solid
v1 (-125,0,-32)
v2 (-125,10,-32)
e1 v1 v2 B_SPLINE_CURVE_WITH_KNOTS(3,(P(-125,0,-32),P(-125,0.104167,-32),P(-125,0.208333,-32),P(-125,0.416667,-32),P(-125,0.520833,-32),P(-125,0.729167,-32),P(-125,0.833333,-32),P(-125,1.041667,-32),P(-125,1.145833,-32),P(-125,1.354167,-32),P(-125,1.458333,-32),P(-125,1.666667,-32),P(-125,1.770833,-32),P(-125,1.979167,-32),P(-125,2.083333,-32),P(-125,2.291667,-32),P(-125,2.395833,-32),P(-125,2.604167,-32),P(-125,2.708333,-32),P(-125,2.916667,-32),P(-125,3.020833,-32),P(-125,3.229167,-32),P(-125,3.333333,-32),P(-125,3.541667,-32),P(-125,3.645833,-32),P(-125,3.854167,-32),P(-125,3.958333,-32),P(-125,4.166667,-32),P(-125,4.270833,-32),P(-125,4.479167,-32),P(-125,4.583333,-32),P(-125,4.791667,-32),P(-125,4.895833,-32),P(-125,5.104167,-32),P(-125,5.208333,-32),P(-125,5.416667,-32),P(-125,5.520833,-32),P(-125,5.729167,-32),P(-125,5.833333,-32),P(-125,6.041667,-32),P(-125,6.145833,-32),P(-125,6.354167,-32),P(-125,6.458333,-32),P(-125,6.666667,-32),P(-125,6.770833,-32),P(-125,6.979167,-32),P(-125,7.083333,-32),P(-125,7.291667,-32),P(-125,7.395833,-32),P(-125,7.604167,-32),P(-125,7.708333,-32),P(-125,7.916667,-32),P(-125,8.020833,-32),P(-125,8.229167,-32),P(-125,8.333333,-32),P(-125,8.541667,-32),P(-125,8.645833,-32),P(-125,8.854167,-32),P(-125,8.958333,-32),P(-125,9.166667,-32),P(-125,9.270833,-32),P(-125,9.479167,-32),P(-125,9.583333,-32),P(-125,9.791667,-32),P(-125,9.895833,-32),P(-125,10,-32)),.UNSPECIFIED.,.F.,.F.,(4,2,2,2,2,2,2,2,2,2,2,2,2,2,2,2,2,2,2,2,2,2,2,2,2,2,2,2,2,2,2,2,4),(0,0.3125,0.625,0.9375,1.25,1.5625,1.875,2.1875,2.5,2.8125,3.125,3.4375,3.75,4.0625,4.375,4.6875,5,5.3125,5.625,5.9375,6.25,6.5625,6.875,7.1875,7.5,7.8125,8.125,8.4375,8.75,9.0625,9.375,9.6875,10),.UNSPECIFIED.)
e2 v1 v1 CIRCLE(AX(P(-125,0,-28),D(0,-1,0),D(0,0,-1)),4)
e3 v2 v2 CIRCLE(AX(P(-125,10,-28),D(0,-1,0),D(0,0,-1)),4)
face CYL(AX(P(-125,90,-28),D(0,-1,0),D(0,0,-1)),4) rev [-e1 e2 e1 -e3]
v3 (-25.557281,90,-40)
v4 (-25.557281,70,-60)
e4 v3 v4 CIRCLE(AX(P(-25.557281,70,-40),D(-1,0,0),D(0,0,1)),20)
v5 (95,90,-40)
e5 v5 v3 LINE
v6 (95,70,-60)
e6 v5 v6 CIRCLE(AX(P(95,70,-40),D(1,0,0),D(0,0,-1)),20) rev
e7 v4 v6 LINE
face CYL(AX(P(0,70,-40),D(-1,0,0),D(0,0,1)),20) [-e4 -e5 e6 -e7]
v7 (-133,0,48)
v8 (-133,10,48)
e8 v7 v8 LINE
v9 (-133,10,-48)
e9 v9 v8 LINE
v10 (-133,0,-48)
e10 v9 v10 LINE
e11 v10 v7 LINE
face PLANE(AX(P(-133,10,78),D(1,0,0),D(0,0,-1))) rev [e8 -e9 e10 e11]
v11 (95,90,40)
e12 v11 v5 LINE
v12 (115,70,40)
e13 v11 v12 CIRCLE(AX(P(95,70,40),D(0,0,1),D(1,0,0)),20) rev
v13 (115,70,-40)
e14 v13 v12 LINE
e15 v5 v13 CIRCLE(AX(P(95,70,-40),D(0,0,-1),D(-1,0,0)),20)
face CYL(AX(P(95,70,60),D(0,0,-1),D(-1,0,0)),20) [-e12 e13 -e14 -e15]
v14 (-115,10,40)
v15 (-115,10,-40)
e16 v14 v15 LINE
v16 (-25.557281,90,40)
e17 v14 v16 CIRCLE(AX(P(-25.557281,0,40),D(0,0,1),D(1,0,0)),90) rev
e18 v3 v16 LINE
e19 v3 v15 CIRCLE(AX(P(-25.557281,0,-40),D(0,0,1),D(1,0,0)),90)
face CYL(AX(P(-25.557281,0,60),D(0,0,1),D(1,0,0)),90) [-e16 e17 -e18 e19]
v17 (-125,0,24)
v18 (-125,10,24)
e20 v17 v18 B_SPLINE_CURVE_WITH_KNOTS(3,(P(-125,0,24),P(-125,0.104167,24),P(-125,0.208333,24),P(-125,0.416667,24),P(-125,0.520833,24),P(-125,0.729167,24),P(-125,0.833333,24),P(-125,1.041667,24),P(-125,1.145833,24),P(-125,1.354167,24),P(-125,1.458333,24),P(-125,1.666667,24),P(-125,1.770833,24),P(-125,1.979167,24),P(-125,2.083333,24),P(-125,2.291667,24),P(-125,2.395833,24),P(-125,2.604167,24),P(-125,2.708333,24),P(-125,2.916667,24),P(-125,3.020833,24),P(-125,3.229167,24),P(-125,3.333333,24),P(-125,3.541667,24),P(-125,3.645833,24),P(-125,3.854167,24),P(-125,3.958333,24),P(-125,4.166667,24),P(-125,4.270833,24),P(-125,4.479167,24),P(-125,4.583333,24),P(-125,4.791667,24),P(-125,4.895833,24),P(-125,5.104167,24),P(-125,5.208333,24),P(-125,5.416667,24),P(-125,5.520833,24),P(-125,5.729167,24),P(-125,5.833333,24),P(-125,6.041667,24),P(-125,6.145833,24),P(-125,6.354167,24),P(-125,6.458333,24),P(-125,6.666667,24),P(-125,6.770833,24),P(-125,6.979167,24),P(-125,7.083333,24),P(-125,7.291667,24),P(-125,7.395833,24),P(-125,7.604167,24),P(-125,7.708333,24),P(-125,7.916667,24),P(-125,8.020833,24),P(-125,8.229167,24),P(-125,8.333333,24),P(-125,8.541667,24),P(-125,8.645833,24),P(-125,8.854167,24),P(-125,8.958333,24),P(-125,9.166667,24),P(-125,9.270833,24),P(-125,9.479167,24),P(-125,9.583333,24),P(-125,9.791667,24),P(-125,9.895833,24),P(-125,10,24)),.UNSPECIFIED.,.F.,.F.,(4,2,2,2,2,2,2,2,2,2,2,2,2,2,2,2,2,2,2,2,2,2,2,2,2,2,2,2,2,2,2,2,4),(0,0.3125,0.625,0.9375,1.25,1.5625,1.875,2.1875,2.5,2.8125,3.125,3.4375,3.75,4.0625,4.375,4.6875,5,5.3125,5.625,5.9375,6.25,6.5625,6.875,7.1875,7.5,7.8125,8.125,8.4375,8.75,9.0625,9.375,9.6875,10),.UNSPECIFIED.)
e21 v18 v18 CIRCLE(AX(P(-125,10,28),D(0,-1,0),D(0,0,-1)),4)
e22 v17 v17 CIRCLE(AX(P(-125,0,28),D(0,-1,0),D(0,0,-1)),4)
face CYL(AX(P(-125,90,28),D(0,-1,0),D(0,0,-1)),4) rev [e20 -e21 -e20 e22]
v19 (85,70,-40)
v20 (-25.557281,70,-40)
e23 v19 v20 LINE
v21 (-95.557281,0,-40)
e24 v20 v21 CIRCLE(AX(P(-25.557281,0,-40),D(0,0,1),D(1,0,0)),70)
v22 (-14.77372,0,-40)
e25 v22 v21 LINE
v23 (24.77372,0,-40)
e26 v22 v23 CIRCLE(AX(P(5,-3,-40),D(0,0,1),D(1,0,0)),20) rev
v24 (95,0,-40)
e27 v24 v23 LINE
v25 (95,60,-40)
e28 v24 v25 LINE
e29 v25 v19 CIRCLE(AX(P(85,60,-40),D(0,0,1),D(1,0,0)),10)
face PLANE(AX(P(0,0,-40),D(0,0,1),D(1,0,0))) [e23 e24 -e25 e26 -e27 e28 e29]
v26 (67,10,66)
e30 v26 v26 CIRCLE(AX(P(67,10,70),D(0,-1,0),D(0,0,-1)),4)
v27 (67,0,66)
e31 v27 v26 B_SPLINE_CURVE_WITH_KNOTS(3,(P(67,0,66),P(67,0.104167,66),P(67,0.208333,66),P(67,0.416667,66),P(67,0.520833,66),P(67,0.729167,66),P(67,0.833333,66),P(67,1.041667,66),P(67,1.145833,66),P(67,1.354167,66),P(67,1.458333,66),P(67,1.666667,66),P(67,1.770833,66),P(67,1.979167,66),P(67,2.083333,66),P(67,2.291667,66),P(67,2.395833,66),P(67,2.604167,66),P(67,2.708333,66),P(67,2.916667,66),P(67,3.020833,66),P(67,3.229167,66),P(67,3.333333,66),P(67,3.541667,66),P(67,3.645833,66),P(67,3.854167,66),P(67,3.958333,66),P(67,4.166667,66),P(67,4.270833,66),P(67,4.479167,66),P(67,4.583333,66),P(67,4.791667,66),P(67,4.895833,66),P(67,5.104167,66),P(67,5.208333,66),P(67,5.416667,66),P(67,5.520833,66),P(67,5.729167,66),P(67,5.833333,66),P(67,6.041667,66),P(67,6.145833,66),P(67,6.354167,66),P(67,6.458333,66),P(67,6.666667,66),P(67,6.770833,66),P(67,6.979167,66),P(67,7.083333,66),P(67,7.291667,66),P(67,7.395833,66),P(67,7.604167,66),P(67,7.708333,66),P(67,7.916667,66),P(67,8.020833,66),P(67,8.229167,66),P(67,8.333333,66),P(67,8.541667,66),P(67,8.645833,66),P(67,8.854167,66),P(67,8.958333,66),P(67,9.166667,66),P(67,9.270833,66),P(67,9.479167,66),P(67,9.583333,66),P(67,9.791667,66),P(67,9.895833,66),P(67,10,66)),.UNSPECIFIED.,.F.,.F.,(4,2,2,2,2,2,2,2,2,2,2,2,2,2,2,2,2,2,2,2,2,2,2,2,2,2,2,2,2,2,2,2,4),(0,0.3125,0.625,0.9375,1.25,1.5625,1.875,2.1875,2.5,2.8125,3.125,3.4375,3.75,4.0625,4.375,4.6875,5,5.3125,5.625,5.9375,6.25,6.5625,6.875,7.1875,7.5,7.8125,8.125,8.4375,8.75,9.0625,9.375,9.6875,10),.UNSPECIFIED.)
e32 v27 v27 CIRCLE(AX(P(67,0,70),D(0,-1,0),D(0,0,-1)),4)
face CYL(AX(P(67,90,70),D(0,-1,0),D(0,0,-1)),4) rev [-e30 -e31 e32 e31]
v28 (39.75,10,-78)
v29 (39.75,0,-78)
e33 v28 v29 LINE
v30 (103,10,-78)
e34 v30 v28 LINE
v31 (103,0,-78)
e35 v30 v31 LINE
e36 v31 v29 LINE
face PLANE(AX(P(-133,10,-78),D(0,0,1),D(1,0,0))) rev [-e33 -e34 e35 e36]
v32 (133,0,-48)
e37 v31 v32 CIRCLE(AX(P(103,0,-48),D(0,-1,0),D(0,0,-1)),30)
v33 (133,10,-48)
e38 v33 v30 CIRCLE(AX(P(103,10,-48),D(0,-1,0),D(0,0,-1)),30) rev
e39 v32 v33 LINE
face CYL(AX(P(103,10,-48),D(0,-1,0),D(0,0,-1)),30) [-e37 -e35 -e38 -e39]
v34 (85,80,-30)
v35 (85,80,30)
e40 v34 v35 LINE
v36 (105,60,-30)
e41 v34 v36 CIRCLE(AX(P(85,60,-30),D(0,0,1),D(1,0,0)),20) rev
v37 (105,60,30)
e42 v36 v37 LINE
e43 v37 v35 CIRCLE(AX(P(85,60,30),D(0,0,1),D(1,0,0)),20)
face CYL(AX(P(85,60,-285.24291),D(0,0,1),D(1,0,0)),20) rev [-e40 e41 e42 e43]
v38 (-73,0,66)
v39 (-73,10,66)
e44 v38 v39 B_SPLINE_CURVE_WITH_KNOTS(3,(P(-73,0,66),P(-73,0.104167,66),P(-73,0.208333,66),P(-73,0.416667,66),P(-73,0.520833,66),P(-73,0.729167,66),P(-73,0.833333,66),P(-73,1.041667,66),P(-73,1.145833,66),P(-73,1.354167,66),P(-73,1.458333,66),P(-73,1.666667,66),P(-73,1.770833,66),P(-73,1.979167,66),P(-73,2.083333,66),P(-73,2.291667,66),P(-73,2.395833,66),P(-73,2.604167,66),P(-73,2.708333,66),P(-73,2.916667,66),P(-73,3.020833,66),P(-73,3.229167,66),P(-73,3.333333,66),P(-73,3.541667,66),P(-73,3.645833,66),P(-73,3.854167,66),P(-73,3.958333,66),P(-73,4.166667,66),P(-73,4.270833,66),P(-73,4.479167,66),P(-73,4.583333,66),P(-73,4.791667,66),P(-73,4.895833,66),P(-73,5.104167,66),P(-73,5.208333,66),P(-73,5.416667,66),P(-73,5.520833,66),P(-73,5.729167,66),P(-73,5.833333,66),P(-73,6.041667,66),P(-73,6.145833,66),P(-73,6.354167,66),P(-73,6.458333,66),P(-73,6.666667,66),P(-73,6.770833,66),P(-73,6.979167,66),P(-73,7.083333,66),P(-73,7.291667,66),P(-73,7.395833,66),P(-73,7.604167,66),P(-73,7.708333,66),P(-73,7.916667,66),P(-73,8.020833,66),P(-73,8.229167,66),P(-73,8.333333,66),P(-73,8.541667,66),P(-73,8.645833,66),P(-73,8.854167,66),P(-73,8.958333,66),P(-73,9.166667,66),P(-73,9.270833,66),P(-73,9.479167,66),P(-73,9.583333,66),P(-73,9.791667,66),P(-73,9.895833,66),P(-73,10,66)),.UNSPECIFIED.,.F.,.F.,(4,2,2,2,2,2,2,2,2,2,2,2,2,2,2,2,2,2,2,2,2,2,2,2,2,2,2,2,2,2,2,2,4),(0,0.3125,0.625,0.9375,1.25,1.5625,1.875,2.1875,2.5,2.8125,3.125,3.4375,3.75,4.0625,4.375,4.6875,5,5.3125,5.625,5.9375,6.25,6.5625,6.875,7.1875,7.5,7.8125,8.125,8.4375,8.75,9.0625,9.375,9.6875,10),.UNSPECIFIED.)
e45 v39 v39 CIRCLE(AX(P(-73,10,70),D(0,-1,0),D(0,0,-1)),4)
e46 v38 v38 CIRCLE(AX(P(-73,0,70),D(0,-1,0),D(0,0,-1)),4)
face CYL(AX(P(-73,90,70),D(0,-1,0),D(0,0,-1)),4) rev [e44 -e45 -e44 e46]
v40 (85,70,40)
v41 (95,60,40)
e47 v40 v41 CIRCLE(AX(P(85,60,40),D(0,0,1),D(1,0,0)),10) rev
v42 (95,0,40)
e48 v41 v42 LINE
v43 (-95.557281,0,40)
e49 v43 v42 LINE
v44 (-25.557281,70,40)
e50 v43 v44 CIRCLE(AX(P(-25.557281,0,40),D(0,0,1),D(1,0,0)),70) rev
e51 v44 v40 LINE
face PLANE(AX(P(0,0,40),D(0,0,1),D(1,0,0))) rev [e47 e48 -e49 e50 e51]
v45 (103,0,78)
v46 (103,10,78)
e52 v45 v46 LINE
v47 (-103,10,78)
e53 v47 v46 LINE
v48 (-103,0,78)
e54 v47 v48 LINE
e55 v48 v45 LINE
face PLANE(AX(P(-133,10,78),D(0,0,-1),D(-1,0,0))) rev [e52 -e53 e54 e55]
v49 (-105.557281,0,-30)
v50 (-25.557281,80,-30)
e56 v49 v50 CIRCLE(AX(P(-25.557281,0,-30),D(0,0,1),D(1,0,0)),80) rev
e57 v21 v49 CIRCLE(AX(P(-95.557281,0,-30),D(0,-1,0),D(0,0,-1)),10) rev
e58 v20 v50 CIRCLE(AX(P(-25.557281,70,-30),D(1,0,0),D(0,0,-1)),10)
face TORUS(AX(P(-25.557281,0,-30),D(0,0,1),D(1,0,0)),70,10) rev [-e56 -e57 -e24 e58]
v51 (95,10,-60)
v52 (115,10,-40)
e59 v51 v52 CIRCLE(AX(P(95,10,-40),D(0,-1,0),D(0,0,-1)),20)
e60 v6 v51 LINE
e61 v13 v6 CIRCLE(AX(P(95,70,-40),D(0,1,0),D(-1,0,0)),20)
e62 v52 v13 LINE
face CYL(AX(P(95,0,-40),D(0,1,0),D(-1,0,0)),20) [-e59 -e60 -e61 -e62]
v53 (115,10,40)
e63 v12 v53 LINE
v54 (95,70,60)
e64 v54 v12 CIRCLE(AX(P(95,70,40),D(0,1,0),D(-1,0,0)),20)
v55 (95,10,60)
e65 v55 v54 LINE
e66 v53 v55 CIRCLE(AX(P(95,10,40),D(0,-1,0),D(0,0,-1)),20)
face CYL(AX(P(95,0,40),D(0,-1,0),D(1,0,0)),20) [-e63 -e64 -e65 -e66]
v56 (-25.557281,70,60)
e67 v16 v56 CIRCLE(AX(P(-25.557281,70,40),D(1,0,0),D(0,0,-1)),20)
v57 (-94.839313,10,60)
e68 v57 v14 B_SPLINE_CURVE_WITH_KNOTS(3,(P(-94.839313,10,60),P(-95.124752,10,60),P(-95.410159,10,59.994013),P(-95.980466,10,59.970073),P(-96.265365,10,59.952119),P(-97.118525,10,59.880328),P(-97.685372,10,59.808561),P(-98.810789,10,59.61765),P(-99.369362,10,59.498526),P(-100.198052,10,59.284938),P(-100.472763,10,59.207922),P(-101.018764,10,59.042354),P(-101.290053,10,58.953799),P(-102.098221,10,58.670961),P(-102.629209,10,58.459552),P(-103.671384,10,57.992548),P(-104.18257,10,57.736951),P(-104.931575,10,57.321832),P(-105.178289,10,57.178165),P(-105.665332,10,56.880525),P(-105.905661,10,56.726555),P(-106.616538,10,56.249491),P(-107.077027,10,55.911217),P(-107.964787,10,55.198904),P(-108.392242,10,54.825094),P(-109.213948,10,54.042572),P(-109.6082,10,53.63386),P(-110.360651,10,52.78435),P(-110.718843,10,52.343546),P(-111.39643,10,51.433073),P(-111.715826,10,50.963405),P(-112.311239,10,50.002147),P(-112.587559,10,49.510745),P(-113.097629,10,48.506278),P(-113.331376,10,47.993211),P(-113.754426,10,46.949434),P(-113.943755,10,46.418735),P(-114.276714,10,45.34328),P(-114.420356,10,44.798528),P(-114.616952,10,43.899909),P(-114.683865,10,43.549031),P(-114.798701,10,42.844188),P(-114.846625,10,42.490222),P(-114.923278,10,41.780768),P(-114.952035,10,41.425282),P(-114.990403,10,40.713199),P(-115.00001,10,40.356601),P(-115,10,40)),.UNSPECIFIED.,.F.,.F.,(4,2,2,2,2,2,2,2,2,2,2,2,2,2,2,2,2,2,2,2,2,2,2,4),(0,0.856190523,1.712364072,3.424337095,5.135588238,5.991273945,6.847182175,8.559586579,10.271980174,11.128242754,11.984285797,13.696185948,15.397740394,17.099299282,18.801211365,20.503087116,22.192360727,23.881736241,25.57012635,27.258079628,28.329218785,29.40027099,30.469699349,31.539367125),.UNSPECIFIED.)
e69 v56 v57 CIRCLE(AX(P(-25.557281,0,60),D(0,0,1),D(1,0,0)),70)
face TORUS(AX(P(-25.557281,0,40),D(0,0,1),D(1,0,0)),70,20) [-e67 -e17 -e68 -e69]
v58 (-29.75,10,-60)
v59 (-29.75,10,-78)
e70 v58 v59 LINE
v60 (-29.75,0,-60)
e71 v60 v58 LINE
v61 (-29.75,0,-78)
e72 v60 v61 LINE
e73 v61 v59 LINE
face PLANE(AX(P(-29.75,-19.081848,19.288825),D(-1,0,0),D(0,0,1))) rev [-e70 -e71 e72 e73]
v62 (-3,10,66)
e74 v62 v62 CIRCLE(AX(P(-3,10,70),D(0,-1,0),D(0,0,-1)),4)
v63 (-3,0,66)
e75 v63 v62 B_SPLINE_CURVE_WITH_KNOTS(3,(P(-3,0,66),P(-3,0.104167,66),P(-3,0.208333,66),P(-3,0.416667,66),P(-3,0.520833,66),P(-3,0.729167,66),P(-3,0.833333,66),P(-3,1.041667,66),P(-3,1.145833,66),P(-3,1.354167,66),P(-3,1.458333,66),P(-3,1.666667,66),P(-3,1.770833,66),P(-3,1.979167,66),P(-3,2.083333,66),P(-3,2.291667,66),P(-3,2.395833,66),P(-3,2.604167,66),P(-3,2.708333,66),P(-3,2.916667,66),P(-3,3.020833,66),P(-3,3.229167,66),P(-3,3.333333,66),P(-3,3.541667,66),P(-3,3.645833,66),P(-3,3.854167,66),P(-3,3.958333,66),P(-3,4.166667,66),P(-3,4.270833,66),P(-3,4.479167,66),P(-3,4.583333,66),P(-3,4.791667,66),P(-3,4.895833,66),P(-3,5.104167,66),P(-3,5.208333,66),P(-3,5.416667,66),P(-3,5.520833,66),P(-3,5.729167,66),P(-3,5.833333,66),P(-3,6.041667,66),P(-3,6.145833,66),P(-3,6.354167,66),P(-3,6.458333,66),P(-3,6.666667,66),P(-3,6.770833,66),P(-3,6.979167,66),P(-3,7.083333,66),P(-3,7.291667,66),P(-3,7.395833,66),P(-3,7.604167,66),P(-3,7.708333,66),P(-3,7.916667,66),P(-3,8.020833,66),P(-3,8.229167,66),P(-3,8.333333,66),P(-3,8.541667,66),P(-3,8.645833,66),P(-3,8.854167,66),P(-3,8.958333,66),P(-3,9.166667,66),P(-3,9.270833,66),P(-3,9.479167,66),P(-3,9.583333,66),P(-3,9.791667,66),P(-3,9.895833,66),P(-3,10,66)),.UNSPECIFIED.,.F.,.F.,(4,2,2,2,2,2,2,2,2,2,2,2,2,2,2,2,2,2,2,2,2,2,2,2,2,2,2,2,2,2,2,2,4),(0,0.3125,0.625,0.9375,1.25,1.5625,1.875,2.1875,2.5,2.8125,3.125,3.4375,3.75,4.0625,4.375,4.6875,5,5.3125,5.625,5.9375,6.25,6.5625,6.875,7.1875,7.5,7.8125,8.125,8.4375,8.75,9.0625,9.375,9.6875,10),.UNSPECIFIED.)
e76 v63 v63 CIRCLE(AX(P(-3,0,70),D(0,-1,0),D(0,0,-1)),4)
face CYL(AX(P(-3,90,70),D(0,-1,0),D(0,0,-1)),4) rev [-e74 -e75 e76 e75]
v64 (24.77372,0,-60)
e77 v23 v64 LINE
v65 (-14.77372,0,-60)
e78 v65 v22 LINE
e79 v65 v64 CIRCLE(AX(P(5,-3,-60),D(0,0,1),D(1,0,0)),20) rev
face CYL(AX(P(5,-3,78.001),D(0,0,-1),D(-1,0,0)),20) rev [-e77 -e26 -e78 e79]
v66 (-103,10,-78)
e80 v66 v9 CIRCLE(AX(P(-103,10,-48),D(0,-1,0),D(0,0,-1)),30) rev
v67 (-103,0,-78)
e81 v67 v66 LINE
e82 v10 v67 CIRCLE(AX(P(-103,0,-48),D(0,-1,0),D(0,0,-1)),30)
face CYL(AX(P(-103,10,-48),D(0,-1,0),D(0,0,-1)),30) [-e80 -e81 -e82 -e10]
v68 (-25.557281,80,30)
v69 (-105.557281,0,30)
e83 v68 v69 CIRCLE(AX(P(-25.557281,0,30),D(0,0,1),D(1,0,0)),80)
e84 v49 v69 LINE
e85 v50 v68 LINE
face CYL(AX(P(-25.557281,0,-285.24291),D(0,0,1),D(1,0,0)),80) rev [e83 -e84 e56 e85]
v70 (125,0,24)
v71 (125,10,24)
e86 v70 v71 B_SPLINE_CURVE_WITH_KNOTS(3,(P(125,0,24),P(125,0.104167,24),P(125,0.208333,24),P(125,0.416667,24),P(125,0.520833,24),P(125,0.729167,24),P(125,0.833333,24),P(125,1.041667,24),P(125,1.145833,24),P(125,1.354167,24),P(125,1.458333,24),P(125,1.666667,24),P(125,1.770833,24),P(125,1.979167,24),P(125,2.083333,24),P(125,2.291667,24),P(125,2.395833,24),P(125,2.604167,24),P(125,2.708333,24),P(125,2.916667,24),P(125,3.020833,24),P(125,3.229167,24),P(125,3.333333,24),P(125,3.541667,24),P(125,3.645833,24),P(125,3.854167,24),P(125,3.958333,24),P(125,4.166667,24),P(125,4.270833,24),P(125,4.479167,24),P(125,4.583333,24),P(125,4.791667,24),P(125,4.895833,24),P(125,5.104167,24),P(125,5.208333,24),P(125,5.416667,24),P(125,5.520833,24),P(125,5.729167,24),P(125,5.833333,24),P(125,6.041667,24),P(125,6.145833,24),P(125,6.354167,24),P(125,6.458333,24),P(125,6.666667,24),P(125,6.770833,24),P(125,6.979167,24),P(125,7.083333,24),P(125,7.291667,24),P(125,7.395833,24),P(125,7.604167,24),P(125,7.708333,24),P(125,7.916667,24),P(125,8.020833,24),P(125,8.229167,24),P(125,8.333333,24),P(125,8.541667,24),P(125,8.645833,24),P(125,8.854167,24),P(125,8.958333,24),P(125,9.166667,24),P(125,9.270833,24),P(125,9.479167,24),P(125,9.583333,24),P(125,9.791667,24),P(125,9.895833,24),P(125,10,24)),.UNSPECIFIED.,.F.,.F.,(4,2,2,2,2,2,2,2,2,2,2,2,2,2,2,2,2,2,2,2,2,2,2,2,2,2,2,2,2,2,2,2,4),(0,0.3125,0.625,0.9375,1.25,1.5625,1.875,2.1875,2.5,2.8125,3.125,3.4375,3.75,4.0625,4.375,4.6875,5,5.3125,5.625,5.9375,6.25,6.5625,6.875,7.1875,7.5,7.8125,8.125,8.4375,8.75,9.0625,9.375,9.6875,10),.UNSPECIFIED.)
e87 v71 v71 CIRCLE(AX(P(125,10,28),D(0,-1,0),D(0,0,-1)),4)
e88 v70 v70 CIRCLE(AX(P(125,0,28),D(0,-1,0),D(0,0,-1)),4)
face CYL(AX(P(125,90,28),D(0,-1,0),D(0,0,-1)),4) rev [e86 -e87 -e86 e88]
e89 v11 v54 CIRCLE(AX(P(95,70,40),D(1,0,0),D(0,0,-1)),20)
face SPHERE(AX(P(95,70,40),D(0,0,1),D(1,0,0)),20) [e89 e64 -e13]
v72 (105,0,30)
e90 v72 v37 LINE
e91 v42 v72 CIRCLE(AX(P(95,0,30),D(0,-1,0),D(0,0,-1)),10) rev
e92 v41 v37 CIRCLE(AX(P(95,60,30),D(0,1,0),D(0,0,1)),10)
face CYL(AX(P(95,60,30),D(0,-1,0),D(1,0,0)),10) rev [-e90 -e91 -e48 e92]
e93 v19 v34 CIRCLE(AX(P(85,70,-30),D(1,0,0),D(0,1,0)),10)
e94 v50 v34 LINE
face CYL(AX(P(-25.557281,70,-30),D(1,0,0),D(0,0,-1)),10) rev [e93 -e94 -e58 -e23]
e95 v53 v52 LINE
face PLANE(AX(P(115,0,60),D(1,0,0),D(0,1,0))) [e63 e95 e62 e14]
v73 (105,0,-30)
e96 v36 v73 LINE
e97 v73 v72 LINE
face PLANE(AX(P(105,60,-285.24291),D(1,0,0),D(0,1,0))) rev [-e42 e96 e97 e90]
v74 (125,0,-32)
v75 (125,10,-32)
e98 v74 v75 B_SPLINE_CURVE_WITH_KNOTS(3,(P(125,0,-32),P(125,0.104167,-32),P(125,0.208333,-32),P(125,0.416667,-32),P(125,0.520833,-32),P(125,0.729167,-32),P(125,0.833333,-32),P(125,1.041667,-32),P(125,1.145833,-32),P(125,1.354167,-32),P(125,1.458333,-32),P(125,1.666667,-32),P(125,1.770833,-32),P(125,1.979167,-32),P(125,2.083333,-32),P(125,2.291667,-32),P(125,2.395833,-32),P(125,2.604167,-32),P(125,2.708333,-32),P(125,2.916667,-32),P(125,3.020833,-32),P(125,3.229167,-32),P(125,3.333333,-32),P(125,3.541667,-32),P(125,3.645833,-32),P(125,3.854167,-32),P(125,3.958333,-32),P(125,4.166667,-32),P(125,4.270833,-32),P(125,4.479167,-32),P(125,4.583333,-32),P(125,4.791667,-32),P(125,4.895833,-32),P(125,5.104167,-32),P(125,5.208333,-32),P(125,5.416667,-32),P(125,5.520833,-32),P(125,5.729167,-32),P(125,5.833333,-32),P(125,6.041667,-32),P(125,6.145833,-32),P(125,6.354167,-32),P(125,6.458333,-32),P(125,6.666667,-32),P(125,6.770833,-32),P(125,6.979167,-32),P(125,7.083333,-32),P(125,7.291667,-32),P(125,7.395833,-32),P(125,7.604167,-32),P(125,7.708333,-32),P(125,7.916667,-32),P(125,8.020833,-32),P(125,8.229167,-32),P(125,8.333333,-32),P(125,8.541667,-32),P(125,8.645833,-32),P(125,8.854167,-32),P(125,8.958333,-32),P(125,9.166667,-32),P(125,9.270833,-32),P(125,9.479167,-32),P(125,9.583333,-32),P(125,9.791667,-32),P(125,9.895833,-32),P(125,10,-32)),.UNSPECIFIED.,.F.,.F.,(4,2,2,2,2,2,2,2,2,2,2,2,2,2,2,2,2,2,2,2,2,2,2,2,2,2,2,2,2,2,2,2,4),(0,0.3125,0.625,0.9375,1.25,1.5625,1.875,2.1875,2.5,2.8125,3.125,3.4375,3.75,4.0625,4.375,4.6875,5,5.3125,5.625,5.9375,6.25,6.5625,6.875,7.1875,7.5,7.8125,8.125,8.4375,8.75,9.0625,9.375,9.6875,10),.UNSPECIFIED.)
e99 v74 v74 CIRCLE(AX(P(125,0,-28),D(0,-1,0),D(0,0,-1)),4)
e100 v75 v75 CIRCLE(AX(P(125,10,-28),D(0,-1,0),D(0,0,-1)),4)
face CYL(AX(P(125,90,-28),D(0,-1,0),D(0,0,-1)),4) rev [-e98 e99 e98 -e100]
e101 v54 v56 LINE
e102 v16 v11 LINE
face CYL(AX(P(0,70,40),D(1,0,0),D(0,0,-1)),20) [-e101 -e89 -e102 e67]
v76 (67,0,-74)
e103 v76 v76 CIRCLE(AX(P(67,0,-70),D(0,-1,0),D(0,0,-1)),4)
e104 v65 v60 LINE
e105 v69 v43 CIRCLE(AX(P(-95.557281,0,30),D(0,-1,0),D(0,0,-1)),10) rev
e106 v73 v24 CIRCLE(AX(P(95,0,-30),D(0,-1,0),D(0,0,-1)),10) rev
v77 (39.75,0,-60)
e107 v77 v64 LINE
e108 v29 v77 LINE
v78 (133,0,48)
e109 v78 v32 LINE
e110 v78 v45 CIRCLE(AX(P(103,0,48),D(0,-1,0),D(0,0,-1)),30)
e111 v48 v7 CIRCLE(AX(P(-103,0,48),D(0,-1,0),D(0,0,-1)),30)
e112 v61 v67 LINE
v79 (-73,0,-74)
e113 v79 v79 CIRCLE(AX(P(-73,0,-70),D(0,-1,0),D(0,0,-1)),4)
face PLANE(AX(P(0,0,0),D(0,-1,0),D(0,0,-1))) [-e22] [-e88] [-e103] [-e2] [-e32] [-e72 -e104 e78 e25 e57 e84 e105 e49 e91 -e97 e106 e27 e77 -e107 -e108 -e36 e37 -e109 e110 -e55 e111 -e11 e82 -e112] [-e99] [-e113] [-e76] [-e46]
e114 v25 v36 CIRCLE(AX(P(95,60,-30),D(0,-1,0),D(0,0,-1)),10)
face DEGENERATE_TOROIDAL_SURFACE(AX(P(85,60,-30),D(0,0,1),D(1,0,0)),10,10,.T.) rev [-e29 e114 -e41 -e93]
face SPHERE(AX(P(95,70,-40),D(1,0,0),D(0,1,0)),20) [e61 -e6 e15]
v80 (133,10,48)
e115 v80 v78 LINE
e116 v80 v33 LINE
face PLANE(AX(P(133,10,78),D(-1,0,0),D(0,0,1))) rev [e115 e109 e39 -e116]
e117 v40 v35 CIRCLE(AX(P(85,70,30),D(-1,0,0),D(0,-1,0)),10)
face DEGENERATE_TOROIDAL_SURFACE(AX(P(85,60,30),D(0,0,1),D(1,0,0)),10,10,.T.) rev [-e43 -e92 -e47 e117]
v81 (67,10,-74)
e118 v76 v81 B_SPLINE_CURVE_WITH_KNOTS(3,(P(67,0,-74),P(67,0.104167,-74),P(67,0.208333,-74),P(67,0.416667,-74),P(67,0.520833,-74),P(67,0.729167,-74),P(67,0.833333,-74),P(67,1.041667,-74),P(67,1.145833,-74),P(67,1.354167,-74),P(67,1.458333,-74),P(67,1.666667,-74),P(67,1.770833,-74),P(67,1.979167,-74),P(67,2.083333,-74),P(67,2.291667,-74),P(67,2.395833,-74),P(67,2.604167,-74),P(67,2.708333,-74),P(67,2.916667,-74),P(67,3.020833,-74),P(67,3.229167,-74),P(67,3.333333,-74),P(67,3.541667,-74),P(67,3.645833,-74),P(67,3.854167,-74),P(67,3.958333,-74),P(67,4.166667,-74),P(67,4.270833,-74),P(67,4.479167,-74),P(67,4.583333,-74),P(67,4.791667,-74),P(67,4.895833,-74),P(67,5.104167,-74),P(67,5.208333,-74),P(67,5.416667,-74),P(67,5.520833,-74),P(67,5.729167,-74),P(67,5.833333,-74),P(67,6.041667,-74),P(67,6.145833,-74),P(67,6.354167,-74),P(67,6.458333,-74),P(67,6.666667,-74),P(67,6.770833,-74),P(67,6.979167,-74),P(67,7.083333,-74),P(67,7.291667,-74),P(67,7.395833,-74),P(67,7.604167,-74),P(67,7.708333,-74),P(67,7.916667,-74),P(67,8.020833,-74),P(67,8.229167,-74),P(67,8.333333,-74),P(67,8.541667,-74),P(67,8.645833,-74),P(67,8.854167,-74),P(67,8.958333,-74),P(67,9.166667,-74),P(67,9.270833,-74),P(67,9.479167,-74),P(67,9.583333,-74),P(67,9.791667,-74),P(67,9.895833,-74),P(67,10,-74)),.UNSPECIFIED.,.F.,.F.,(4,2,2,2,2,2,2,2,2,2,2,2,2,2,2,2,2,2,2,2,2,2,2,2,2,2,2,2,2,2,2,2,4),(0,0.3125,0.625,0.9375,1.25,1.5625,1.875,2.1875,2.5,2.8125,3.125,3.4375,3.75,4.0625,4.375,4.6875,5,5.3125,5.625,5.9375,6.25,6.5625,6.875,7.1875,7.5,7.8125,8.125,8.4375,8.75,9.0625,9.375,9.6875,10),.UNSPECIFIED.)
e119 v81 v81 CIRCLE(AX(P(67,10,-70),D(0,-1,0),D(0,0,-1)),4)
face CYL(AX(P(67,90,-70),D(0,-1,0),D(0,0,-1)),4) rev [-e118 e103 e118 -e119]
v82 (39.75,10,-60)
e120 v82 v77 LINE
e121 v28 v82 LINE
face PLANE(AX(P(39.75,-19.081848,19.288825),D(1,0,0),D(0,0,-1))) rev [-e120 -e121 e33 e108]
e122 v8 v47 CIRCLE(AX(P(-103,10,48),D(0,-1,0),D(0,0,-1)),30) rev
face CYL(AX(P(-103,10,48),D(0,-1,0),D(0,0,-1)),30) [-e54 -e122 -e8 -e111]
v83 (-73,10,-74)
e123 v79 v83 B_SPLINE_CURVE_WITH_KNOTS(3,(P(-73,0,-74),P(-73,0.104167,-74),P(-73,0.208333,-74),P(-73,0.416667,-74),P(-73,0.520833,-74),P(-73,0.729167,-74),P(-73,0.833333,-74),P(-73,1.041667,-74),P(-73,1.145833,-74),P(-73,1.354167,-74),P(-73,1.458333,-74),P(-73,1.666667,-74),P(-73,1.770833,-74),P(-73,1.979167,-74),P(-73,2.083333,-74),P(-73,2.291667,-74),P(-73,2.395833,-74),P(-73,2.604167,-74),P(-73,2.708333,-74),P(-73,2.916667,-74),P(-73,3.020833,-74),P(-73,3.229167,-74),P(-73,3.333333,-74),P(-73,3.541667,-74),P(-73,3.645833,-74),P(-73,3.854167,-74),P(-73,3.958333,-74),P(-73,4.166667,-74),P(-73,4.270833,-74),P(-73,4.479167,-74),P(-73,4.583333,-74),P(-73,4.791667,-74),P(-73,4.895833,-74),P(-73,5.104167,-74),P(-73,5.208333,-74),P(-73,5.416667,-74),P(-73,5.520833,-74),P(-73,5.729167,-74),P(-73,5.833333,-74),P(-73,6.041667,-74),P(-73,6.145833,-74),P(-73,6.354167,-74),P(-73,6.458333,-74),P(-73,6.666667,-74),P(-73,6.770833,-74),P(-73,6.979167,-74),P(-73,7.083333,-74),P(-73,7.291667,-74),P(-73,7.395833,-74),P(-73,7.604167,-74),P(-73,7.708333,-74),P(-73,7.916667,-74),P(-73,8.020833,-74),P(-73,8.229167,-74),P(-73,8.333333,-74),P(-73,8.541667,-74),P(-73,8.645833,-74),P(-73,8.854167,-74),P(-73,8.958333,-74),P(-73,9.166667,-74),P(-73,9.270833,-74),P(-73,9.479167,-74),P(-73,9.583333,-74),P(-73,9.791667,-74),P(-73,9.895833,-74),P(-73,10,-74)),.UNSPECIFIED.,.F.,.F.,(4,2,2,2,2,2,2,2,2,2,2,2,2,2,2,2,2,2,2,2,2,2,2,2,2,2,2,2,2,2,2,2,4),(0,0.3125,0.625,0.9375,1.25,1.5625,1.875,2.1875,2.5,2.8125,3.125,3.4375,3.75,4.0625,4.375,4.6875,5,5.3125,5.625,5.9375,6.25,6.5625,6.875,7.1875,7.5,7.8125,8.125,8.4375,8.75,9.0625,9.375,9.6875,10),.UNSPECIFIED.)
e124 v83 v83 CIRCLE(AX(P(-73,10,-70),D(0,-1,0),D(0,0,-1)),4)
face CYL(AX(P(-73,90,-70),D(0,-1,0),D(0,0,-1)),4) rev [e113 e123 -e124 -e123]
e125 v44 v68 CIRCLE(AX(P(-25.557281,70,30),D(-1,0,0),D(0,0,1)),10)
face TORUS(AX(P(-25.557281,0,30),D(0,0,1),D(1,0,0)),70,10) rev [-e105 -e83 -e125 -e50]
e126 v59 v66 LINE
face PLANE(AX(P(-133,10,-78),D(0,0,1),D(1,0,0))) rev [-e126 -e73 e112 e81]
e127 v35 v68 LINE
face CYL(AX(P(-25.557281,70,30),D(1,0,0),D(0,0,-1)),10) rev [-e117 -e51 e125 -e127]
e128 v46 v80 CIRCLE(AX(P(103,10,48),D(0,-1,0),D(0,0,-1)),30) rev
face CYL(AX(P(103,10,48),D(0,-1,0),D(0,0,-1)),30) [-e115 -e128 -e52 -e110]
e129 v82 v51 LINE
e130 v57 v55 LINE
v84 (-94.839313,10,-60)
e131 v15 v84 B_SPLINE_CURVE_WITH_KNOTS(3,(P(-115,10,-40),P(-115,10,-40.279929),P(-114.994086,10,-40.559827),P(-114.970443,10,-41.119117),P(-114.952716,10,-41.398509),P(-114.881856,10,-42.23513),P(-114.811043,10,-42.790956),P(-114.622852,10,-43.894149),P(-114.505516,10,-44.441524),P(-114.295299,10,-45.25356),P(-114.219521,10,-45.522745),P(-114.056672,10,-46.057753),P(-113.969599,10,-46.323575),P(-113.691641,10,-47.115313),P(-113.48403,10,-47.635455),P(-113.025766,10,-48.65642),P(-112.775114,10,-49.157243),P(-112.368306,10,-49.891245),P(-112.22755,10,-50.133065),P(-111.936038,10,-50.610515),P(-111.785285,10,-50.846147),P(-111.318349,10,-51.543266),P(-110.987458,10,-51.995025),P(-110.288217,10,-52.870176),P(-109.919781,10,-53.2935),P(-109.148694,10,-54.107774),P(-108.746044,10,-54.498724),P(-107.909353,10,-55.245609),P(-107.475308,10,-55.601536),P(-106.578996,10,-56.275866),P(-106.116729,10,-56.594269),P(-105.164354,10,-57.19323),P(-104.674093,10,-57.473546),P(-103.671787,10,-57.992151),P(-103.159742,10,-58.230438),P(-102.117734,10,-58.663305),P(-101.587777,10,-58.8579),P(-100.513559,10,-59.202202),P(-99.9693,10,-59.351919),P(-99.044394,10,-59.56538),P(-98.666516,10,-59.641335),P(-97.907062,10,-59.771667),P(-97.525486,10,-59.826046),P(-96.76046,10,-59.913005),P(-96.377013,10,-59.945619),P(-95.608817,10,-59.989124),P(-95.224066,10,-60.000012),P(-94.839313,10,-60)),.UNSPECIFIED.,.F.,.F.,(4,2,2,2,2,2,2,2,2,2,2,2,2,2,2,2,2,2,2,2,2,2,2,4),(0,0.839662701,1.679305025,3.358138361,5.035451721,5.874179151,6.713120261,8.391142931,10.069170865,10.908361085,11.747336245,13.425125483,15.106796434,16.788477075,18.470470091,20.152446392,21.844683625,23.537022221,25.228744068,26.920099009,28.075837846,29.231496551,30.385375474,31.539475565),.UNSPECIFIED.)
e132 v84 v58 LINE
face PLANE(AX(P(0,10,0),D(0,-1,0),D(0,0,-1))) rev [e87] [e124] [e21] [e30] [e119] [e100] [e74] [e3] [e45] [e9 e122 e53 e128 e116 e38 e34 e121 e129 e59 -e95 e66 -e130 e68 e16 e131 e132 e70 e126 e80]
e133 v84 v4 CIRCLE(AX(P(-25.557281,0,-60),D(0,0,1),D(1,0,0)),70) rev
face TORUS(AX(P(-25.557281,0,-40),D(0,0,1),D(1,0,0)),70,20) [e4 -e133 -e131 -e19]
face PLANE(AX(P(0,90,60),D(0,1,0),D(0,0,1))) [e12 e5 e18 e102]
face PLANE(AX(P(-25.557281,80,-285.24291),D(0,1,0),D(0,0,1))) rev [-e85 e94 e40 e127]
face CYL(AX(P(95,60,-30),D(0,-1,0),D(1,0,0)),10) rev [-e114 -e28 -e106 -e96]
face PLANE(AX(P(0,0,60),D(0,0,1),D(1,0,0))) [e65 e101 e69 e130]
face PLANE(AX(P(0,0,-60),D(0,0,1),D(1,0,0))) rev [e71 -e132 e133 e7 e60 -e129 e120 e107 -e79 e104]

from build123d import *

# Parameters (mm, degrees)
SKETCH1_W               = 266
SKETCH1_H               = 156
BOSS_EXTRUDE1_DEPTH     = 10
SKETCH2_W               = 230
SKETCH2_H               = 80
BOSS_EXTRUDE2_DEPTH     = 60
FILLET1_R               = 90
FILLET2_R               = 20
CUT_EXTRUDE1_DEPTH      = 40
CUT_EXTRUDE1_DEPTH_BACK = 40
FILLET3_R               = 10
CUT_EXTRUDE2_REACH      = 225.886
SKETCH4_R               = 20
SKETCH5_W               = 69.5
SKETCH5_H               = 38.16369677
CUT_EXTRUDE3_DEPTH      = 18
SKETCH6_R               = 4
CUT_EXTRUDE4_DEPTH      = 179.530109674
FILLET4_R               = 30


with BuildPart() as part:
    # Sketch1 → Boss-Extrude1 (new body)
    with BuildSketch(Plane(origin=(0, 0, 0), x_dir=(1, 0, 0), z_dir=(0, 1, 0))):
        Rectangle(SKETCH1_W, SKETCH1_H)
    extrude(amount=BOSS_EXTRUDE1_DEPTH)

    # Sketch2 → Boss-Extrude2 (add, symmetric)
    with BuildSketch(Plane.XY):
        with Locations((0, 50)):
            Rectangle(SKETCH2_W, SKETCH2_H)
    extrude(amount=BOSS_EXTRUDE2_DEPTH, both=True)

    # Fillet1
    # the kernel refuses this fillet: 90 mm, written as the material it takes off along each edge
    with BuildSketch(Plane(origin=(-115, 90, -283.60679775), x_dir=(0, -1, 0), z_dir=(0, 0, 1))) as fillet1_piece_1:
        with BuildLine():
            CenterArc((90, 89.4427191), FILLET1_R, 180, 83.620629792)
            Line((0, 89.4427191), (-1.8, 89.4427191))
            Line((-1.8, 89.4427191), (-1.8, 0))
            Line((-1.8, 0), (0, -1.8))
            ThreePointArc((0, -1.8), (40, -1.8), (79.8, -1.788854382))
            Line((79.8, -1.788854382), (80, 0))
        make_face()
    extrude(amount=567.2135955, mode=Mode.SUBTRACT)

    # Fillet2
    fillet2_edges = [part.edges().sort_by_distance(p)[0] for p in [
        (115, 50, 60),
        (115, 90, 0),
        (115, 50, -60),
        (44.72135955, 90, -60),
        (-85.5572809, 67.082039325, -60),
        (44.72135955, 90, 60),
        (-85.5572809, 67.082039325, 60),
    ]]
    fillet(fillet2_edges, radius=FILLET2_R)

    # Sketch3 → Cut-Extrude1 (cut, two sides: drawn at the far end of the back side and taken through both)
    with BuildSketch(Plane.XY.offset(-CUT_EXTRUDE1_DEPTH_BACK)):
        with BuildLine():
            Line((-105.5572809, 0), (105, 0))
            Line((105, 0), (105, 60))
            ThreePointArc((105, 60), (99.142135624, 74.142135624), (85, 80))
            Line((85, 80), (-25.5572809, 80))
            ThreePointArc((-25.5572809, 80), (-82.125823395, 56.568542495), (-105.5572809, 0))
        make_face()
    extrude(amount=CUT_EXTRUDE1_DEPTH + CUT_EXTRUDE1_DEPTH_BACK, mode=Mode.SUBTRACT)

    # Fillet3
    fillet3_edges = [part.edges().sort_by_distance(p)[0] for p in [
        (99.142135624, 74.142135624, -40),
        (105, 30, -40),
        (-82.125823395, 56.568542495, -40),
        (29.72135955, 80, -40),
        (105, 30, 40),
        (99.142135624, 74.142135624, 40),
        (29.72135955, 80, 40),
        (-82.125823395, 56.568542495, 40),
    ]]
    fillet(fillet3_edges, radius=FILLET3_R)

    # Sketch4 → Cut-Extrude2 (cut, up to next)
    with BuildSketch(Plane(origin=(0, 0, -78), x_dir=(-1, 0, 0), z_dir=(0, 0, -1)), mode=Mode.PRIVATE) as cut_extrude2_sk1:
        with Locations((-5, -3)):
            Circle(SKETCH4_R)
    cut_extrude2_tool1 = extrude(cut_extrude2_sk1.sketch, amount=-CUT_EXTRUDE2_REACH, mode=Mode.PRIVATE) & part.part
    add(cut_extrude2_tool1.solids().sort_by_distance((5, -3, -78))[0], mode=Mode.SUBTRACT)

    # Sketch5 → Cut-Extrude3 (cut)
    with BuildSketch(Plane(origin=(0, 0, -78), x_dir=(-1, 0, 0), z_dir=(0, 0, -1))):
        with Locations((-5, 0)):
            Rectangle(SKETCH5_W, SKETCH5_H)
    extrude(amount=-CUT_EXTRUDE3_DEPTH, mode=Mode.SUBTRACT)

    # Sketch6 → Cut-Extrude4 (cut, through all)
    with BuildSketch(Plane.XZ):
        with Locations(Location((-125, -28, 0), (0, 0, 270))):
            Circle(SKETCH6_R)
        with Locations(Location((125, -28, 0), (0, 0, 270))):
            Circle(SKETCH6_R)
        with Locations(Location((125, 28, 0), (0, 0, 270))):
            Circle(SKETCH6_R)
        with Locations(Location((-125, 28, 0), (0, 0, 270))):
            Circle(SKETCH6_R)
        with Locations(Location((-73, -70, 0), (0, 0, 270))):
            Circle(SKETCH6_R)
        with Locations(Location((67, -70, 0), (0, 0, 270))):
            Circle(SKETCH6_R)
        with Locations(Location((-3, 70, 0), (0, 0, 270))):
            Circle(SKETCH6_R)
        with Locations(Location((67, 70, 0), (0, 0, 270))):
            Circle(SKETCH6_R)
        with Locations(Location((-73, 70, 0), (0, 0, 270))):
            Circle(SKETCH6_R)
    extrude(amount=-CUT_EXTRUDE4_DEPTH, mode=Mode.SUBTRACT)

    # Fillet4
    fillet4_edges = [part.edges().sort_by_distance(p)[0] for p in [
        (133, 5, 78),
        (-133, 5, 78),
        (-133, 5, -78),
        (133, 5, -78),
    ]]
    fillet(fillet4_edges, radius=FILLET4_R)


solid = part.part
